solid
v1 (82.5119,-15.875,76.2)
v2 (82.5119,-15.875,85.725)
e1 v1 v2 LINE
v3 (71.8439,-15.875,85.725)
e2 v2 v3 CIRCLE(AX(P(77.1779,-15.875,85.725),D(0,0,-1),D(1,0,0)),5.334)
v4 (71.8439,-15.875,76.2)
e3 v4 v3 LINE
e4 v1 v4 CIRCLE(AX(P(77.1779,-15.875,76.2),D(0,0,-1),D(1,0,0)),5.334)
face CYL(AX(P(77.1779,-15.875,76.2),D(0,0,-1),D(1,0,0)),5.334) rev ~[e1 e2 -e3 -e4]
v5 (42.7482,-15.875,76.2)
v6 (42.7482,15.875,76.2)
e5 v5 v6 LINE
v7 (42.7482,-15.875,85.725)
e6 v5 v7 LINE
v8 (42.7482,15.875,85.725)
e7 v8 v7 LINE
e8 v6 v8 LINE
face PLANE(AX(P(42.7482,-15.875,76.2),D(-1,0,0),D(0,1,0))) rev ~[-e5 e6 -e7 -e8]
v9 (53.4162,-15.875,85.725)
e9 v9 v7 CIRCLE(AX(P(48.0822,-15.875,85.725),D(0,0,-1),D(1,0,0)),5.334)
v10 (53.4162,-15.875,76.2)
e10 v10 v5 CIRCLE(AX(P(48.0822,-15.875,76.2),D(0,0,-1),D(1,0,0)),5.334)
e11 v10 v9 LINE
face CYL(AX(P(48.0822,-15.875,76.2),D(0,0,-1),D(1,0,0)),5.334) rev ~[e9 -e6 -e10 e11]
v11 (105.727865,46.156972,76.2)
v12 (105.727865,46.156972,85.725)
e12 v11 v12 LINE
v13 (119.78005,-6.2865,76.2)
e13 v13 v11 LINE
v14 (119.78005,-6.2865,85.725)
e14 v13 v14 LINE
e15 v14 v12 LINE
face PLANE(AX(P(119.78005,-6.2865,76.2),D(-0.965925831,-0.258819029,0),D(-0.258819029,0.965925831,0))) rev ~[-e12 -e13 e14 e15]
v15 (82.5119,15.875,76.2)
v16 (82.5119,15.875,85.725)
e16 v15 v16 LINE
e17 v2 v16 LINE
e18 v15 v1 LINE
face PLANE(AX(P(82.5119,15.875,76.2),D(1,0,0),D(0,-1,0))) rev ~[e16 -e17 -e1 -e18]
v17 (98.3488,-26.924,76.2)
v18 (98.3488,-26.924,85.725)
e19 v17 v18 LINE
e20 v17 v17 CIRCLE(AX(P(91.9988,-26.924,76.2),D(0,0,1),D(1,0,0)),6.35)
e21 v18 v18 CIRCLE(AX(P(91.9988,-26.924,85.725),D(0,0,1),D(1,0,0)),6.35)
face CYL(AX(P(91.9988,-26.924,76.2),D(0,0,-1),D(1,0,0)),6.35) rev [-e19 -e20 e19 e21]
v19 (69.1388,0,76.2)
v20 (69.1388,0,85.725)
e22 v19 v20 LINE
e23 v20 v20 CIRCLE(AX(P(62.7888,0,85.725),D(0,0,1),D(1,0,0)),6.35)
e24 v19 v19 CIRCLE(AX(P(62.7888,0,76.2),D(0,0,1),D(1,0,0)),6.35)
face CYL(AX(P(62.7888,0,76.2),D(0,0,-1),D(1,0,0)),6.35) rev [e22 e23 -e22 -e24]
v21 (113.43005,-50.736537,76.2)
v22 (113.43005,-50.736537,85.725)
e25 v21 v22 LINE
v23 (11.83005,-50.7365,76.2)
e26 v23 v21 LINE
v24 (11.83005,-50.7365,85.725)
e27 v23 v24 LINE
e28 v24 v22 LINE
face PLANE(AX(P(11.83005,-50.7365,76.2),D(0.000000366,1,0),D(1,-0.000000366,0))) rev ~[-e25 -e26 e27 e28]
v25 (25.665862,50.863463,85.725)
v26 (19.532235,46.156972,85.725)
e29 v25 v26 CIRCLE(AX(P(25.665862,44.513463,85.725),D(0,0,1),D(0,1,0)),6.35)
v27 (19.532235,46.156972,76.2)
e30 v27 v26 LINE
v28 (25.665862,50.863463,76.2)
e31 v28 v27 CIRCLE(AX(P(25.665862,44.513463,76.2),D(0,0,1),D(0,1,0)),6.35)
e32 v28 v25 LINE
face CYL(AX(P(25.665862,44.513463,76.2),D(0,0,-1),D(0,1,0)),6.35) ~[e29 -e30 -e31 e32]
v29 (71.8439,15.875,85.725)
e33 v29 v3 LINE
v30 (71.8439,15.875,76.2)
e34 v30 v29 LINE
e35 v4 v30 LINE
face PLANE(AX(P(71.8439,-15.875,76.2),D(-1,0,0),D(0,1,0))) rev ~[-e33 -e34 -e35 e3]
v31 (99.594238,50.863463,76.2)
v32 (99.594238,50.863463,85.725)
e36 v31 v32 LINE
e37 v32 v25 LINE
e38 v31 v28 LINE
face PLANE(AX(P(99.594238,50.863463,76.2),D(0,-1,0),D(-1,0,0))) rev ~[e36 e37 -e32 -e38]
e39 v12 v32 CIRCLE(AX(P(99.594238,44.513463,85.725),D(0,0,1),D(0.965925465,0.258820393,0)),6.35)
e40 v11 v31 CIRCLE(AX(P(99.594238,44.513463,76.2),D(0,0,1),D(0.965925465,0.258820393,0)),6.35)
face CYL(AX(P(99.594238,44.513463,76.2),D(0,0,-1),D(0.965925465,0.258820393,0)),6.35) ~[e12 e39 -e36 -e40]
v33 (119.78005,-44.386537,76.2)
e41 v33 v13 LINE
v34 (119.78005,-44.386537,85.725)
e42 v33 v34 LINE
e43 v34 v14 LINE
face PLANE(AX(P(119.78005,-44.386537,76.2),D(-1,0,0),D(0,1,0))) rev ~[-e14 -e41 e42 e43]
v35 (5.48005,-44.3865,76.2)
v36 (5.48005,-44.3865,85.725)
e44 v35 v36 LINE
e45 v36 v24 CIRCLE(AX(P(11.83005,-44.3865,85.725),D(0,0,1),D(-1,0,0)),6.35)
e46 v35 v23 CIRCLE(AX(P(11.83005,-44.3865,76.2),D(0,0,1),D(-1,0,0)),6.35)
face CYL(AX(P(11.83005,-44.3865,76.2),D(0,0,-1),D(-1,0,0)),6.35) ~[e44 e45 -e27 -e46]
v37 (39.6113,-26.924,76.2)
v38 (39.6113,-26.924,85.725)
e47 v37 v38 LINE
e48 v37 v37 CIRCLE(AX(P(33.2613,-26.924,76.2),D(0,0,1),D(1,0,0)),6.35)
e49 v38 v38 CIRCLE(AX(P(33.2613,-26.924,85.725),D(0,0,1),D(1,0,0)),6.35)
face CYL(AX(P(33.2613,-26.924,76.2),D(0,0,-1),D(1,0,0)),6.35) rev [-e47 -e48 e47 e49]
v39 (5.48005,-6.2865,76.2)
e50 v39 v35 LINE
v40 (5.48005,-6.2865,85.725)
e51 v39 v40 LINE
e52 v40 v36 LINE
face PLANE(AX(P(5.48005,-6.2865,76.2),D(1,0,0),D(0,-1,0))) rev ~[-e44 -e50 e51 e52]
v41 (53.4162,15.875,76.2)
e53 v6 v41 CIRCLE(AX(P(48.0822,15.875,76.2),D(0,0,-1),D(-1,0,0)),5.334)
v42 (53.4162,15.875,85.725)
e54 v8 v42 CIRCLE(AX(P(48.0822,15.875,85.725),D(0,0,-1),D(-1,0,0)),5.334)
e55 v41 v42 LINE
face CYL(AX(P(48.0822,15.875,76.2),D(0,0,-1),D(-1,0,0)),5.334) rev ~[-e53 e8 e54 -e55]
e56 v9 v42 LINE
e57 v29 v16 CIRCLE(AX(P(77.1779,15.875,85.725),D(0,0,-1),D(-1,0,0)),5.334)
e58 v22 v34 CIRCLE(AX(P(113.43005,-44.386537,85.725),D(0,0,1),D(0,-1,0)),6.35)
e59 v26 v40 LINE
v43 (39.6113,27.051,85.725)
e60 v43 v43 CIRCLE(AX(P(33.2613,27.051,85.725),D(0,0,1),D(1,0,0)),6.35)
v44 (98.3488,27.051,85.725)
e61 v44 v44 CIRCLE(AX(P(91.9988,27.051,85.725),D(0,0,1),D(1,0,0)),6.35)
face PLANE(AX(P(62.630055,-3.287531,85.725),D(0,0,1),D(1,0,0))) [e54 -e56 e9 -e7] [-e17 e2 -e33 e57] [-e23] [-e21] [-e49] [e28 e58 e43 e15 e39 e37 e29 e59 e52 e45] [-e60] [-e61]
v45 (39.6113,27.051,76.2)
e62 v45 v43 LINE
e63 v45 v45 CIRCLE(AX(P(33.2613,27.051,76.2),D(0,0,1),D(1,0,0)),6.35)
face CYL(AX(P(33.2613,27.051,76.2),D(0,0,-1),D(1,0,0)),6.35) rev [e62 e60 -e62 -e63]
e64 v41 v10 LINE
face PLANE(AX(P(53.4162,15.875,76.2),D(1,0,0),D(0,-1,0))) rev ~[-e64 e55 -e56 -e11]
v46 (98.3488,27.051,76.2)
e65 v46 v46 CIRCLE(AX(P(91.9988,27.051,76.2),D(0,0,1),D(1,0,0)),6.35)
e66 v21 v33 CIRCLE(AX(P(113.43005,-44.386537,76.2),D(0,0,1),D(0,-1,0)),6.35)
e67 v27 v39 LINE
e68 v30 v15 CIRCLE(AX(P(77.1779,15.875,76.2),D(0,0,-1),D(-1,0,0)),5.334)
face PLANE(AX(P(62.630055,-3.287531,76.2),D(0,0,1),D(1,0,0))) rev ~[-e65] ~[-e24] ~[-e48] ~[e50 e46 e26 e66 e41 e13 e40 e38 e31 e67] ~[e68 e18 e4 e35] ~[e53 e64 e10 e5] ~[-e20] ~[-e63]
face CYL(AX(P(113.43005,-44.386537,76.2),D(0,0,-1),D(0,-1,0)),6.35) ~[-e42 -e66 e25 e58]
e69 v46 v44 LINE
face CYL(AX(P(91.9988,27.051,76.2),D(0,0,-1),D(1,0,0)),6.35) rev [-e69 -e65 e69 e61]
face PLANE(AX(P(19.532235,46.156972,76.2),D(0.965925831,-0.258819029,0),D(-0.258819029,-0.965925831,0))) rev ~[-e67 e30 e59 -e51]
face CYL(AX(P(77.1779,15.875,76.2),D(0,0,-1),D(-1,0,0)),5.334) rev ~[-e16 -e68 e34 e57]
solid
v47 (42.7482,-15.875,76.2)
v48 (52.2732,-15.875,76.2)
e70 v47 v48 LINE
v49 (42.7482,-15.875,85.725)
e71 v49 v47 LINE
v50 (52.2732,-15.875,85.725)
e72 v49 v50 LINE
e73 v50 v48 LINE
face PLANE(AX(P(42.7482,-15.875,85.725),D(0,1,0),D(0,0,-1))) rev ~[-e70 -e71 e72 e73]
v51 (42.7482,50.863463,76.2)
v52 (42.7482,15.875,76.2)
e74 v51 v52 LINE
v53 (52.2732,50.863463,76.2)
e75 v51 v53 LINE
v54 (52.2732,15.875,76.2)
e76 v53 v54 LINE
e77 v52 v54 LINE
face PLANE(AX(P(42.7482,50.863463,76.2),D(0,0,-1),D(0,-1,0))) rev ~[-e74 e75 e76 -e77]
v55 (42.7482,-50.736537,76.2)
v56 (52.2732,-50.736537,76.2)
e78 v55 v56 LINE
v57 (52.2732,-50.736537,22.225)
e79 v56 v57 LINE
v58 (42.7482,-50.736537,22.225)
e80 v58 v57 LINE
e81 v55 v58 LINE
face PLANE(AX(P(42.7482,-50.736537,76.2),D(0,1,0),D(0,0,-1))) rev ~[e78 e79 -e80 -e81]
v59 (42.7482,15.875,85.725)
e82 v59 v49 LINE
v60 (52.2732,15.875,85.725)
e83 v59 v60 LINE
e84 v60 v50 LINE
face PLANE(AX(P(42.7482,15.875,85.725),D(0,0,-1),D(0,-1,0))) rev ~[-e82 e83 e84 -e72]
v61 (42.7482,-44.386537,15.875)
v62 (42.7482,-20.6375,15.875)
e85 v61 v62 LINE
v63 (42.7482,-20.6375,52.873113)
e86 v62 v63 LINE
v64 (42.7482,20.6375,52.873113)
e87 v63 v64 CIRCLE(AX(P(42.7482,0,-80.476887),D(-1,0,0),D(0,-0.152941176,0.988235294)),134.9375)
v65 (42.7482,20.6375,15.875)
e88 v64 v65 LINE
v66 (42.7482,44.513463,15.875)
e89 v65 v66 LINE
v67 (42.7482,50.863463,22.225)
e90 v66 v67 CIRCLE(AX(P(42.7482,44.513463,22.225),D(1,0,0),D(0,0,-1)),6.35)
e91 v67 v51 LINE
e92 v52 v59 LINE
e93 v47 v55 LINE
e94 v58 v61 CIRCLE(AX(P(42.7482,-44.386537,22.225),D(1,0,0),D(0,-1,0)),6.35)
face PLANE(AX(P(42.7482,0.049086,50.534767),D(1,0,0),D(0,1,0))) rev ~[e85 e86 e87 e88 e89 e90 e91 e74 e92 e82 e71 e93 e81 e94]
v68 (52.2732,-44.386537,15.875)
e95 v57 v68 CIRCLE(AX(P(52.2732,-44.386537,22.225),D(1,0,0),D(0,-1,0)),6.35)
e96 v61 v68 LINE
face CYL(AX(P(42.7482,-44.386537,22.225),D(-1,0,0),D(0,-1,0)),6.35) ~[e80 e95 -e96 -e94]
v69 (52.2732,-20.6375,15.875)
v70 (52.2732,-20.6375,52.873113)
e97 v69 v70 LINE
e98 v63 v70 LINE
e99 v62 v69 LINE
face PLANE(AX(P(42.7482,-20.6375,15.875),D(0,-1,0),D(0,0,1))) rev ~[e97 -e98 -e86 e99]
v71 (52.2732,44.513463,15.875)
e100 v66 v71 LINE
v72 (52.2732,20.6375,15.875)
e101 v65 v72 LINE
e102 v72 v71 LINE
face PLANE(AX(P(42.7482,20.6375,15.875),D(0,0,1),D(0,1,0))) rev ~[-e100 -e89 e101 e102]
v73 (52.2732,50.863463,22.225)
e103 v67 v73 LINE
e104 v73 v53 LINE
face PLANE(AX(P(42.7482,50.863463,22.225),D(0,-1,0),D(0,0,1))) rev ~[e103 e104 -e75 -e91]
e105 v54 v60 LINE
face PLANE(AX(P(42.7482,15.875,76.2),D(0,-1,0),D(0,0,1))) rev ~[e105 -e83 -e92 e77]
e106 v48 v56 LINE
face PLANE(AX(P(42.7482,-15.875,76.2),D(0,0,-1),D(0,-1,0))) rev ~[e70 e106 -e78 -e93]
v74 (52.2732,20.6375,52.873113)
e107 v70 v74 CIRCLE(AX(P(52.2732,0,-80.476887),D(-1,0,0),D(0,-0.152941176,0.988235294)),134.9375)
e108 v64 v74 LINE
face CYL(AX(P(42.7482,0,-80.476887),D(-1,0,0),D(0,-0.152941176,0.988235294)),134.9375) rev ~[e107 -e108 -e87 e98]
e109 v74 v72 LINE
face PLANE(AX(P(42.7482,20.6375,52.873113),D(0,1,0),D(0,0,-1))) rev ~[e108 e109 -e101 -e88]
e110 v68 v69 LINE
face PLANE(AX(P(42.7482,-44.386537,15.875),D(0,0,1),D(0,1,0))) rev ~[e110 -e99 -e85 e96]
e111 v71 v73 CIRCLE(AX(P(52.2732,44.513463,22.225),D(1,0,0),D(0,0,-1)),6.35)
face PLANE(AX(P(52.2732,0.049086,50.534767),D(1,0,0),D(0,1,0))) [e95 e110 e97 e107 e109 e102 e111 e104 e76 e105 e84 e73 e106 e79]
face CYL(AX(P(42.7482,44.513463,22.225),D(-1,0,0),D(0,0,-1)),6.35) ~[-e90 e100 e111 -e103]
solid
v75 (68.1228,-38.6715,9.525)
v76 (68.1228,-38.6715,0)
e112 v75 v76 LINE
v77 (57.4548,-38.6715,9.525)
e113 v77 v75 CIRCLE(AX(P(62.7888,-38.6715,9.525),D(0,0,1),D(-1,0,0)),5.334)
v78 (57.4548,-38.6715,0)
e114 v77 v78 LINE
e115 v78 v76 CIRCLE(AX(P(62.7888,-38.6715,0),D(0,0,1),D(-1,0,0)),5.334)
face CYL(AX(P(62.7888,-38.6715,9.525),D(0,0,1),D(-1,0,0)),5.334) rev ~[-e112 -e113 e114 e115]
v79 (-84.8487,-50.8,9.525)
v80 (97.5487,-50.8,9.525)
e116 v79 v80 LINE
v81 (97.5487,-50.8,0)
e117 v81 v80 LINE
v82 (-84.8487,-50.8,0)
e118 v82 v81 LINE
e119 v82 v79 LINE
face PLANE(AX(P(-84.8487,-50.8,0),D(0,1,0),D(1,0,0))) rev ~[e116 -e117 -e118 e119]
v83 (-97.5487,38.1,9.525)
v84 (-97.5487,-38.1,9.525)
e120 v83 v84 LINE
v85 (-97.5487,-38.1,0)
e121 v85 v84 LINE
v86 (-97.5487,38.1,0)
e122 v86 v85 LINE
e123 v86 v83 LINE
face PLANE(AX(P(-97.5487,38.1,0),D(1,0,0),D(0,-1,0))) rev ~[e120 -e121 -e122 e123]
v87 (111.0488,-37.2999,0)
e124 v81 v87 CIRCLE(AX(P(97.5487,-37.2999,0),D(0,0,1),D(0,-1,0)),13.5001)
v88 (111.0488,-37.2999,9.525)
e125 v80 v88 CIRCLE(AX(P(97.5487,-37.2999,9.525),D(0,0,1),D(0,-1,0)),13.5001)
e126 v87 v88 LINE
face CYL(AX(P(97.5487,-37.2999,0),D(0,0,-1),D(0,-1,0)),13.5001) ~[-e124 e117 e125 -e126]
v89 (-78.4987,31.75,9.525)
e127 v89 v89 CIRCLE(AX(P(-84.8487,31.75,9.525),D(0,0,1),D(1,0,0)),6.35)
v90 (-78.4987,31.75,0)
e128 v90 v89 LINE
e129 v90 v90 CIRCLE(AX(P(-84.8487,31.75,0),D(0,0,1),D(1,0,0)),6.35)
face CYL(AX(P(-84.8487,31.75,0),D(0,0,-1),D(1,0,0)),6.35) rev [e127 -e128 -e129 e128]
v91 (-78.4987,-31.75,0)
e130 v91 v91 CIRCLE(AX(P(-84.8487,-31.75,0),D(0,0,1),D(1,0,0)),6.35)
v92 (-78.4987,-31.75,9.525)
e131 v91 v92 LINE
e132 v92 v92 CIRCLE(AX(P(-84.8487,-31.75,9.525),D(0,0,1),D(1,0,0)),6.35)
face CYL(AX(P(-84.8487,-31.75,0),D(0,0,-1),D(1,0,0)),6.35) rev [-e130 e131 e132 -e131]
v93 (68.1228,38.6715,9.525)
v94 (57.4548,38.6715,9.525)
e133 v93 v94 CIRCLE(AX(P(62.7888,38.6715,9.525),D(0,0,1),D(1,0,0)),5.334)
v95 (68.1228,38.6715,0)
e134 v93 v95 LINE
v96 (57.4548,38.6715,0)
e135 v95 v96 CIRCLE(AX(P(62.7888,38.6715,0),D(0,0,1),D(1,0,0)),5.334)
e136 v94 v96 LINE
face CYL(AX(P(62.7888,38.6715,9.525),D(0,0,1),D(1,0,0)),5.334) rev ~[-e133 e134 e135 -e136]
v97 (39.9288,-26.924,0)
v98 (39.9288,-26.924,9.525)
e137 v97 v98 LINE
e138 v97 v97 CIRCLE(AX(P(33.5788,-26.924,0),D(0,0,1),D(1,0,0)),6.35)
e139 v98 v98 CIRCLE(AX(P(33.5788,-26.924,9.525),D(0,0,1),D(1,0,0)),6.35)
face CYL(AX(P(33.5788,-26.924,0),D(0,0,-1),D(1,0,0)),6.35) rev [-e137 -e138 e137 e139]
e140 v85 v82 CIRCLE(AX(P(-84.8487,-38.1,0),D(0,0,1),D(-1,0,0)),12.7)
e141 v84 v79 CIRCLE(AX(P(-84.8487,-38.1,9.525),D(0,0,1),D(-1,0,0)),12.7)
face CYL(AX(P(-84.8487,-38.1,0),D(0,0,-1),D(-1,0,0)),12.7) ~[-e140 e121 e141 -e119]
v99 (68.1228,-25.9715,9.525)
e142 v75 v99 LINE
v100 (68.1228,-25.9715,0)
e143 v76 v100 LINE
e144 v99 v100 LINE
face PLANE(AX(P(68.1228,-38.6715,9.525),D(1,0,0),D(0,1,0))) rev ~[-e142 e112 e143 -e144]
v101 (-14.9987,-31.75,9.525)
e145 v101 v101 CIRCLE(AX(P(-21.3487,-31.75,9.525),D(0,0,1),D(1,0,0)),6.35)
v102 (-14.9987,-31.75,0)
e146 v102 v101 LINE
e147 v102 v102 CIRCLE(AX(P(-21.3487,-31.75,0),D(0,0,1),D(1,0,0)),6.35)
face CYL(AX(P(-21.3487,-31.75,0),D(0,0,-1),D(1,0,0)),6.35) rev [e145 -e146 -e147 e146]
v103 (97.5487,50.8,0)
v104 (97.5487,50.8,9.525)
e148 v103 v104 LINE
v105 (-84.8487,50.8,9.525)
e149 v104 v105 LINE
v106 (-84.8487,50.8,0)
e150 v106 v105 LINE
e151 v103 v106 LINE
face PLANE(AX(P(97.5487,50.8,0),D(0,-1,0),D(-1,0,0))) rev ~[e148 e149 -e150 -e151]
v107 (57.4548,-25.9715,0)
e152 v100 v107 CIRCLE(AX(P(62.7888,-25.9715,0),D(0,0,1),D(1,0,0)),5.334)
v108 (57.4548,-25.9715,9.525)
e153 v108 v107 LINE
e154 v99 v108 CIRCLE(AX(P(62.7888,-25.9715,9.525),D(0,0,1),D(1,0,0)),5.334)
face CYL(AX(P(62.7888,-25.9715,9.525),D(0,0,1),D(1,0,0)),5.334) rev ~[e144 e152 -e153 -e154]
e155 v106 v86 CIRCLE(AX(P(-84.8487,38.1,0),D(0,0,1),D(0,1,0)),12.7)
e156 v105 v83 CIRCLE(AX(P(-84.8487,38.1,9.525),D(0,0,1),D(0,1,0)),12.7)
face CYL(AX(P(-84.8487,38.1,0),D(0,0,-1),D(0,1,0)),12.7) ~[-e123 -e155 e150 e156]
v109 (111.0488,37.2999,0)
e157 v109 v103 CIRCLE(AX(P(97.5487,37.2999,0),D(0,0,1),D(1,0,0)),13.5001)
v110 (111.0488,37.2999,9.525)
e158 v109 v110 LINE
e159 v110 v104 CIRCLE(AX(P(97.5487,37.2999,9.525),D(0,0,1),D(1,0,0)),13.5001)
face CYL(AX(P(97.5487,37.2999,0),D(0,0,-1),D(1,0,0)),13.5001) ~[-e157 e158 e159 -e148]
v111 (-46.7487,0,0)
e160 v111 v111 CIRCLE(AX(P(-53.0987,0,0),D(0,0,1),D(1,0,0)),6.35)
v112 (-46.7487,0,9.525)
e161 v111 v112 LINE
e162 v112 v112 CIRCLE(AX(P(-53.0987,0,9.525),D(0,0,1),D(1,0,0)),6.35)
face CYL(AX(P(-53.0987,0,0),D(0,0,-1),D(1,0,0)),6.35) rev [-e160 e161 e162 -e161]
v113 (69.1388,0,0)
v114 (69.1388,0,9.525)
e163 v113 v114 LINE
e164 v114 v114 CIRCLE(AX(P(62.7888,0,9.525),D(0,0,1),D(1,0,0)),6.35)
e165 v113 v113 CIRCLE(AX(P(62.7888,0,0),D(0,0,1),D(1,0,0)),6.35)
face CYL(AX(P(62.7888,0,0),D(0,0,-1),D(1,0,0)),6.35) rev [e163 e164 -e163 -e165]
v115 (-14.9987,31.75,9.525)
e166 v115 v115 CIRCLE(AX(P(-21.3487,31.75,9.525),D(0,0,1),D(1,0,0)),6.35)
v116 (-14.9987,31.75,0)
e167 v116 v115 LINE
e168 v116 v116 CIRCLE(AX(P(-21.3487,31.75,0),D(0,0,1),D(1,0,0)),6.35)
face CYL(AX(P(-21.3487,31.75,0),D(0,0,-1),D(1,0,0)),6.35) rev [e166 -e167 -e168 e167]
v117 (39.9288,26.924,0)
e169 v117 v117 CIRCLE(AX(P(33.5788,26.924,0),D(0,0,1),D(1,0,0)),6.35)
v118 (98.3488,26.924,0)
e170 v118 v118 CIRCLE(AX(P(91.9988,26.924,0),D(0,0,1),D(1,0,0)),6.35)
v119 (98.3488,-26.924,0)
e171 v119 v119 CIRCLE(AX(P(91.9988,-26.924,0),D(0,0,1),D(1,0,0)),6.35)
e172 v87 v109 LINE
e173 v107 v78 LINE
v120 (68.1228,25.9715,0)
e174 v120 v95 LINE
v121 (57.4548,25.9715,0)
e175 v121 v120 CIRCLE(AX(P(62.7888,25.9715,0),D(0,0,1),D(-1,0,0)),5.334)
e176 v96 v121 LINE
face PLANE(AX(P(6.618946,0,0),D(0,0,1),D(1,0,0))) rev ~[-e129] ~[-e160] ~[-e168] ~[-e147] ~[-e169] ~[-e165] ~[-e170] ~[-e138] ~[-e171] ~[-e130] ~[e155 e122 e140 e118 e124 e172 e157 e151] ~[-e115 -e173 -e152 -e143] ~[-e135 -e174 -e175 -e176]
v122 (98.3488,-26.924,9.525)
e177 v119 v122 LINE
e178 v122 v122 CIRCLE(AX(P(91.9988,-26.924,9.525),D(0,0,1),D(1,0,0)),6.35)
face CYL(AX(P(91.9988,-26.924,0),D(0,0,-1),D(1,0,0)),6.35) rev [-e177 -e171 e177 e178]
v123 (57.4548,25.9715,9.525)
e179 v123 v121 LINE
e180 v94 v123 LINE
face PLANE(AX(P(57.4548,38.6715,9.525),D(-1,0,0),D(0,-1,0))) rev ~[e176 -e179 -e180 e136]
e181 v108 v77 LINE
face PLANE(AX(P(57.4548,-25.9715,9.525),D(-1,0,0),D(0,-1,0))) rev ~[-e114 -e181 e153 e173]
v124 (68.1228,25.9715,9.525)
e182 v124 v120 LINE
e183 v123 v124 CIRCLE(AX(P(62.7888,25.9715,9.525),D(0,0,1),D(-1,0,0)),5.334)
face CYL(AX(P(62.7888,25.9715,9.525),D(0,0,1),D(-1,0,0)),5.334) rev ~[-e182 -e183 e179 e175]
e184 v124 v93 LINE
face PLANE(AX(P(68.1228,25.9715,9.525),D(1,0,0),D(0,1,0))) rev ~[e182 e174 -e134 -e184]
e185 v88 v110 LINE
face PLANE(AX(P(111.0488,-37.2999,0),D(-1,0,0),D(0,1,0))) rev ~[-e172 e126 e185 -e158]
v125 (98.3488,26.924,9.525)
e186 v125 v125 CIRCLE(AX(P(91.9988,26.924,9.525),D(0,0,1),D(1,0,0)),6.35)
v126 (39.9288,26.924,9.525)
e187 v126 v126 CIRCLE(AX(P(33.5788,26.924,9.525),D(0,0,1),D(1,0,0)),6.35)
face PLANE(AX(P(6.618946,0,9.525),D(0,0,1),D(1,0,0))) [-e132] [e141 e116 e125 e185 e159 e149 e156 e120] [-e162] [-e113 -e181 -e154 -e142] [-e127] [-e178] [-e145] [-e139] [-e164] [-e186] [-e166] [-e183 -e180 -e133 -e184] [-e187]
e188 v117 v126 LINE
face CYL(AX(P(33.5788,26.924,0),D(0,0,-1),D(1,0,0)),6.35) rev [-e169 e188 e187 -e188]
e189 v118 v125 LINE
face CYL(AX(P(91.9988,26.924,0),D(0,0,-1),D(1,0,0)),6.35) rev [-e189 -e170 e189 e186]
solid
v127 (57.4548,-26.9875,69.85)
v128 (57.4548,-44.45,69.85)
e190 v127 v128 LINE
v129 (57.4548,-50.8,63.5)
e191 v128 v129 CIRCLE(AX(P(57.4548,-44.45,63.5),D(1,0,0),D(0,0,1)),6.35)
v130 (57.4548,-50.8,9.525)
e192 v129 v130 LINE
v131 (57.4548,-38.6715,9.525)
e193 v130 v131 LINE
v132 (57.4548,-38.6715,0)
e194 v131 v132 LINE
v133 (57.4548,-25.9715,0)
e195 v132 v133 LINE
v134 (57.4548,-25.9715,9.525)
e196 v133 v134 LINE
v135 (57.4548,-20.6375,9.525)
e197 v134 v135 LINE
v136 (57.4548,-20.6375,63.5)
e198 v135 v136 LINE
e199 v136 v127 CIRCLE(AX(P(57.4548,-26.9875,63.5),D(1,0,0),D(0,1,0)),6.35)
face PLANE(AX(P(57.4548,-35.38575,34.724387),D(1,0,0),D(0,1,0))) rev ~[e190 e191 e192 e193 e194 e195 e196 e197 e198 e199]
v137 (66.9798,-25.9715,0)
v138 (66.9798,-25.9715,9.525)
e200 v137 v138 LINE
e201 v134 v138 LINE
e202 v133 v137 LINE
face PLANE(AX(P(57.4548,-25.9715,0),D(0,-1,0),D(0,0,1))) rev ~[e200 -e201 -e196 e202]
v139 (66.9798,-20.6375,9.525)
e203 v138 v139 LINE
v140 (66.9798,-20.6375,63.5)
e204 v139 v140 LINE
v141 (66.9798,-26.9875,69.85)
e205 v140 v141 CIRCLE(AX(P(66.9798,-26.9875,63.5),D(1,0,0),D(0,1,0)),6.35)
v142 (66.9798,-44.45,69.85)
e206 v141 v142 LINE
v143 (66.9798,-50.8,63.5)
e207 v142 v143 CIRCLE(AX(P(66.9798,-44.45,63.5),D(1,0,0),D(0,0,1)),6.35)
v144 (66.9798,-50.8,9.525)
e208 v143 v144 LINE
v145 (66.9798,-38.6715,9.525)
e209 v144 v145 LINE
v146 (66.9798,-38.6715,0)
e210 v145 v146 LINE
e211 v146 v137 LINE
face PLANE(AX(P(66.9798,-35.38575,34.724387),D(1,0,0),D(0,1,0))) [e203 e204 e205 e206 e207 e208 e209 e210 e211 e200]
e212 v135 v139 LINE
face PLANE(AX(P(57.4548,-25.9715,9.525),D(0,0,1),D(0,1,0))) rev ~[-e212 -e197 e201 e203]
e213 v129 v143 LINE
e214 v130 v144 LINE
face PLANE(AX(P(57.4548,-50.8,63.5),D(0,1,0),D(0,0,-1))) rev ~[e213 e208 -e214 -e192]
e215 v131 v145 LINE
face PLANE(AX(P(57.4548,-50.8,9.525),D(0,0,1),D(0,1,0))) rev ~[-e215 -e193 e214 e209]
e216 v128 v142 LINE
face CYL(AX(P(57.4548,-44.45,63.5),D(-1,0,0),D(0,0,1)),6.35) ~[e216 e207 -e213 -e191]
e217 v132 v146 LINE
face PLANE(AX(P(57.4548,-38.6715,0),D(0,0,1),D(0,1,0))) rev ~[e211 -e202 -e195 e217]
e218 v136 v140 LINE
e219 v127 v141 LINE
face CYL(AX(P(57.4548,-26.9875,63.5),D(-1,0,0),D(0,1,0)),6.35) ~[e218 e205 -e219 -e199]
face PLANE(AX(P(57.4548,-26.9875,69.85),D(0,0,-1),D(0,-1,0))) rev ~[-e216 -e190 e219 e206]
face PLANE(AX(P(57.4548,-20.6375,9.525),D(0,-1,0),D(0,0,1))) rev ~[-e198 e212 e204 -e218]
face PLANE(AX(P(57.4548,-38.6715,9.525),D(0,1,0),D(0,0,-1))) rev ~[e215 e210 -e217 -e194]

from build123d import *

# Parameters (mm, degrees)
F0_R      = 6.35
F1_DEPTH  = 9.525
F3_DEPTH  = 25.4
F5_R      = 6.35
F6_DEPTH  = 9.525
F8_DEPTH  = 25.4
F10_DEPTH = 9.525
F12_DEPTH = 9.525


# Not quite as in the source:
# - ends of sketch curves that miss each other by under 0.0002 mm in the source are joined


with BuildPart() as f1:
    # F0 (on Top) → F1 (new body)
    with BuildSketch(Plane.XY):
        with BuildLine():
            ThreePointArc((-97.5487, -38.1), (-93.8289561211, -47.0802561211), (-84.8487, -50.8))
            Line((-84.8487, -50.8), (97.5487, -50.8))
            ThreePointArc((97.5487, -50.8), (107.0947122567, -46.8459122567), (111.0488, -37.2999))
            Line((111.0488, -37.2999), (111.0488, 37.2999))
            ThreePointArc((111.0488, 37.2999), (107.0947122567, 46.8459122567), (97.5487, 50.8))
            Line((97.5487, 50.8), (-84.8487, 50.8))
            ThreePointArc((-84.8487, 50.8), (-93.8289561211, 47.0802561211), (-97.5487, 38.1))
            Line((-97.5487, 38.1), (-97.5487, -38.1))
        make_face()
        with Locations((-84.8487, -31.75)):
            Circle(F0_R, mode=Mode.SUBTRACT)
        with Locations((-21.3487, -31.75)):
            Circle(F0_R, mode=Mode.SUBTRACT)
        with Locations((33.5788, -26.924)):
            Circle(F0_R, mode=Mode.SUBTRACT)
        with Locations((91.9988, -26.924)):
            Circle(F0_R, mode=Mode.SUBTRACT)
        with Locations((-53.0987, 0)):
            Circle(F0_R, mode=Mode.SUBTRACT)
        with Locations((62.7888, 0)):
            Circle(F0_R, mode=Mode.SUBTRACT)
        with Locations((33.5788, 26.924)):
            Circle(F0_R, mode=Mode.SUBTRACT)
        with Locations((91.9988, 26.924)):
            Circle(F0_R, mode=Mode.SUBTRACT)
        with Locations((-84.8487, 31.75)):
            Circle(F0_R, mode=Mode.SUBTRACT)
        with Locations((-21.3487, 31.75)):
            Circle(F0_R, mode=Mode.SUBTRACT)
    extrude(amount=F1_DEPTH)

    # F2 (on face) → F3 (cut)
    with BuildSketch(Plane.XY.offset(9.525)):
        with BuildLine():
            ThreePointArc((57.4548, 25.9715), (62.7888, 20.6375), (68.1228, 25.9715))
            Line((68.1228, 25.9715), (68.1228, 38.6715))
            ThreePointArc((68.1228, 38.6715), (62.7888, 44.0055), (57.4548, 38.6715))
            Line((57.4548, 38.6715), (57.4548, 25.9715))
        make_face()
        with BuildLine():
            ThreePointArc((57.4548, -38.6715), (62.7888, -44.0055), (68.1228, -38.6715))
            Line((68.1228, -38.6715), (68.1228, -25.9715))
            ThreePointArc((68.1228, -25.9715), (62.7888, -20.6375), (57.4548, -25.9715))
            Line((57.4548, -25.9715), (57.4548, -38.6715))
        make_face()
    extrude(amount=-F3_DEPTH, mode=Mode.SUBTRACT)


with BuildPart() as f6:
    # F5 (on offset) → F6 (new body)
    with BuildSketch(Plane.XY.offset(76.2)):
        with BuildLine():
            Line((99.5942382, 50.8634627833), (25.6658618, 50.8634627833))
            ThreePointArc((25.6658618, 50.8634627833), (21.8002302398, 49.5512591905), (19.5322350958, 46.1569722763))
            Line((19.5322350958, 46.1569722763), (5.48005, -6.2865))
            Line((5.48005, -6.2865), (5.48005, -44.3865))
            ThreePointArc((5.48005, -44.3865), (7.3399219395, -48.8766280605), (11.83005, -50.7365))
            Line((11.83005, -50.7365), (113.43005, -50.7365372167))
            ThreePointArc((113.43005, -50.7365372167), (117.9201780605, -48.8766652773), (119.78005, -44.3865372167))
            Line((119.78005, -44.3865372167), (119.78005, -6.2865))
            Line((119.78005, -6.2865), (105.7278649042, 46.1569722763))
            ThreePointArc((105.7278649042, 46.1569722763), (103.4598697602, 49.5512591905), (99.5942382, 50.8634627833))
        make_face()
        with Locations((33.2613, -26.924)):
            Circle(F5_R, mode=Mode.SUBTRACT)
        with Locations((91.9988, -26.924)):
            Circle(F5_R, mode=Mode.SUBTRACT)
        with Locations((62.7888, 0)):
            Circle(F5_R, mode=Mode.SUBTRACT)
        with Locations((33.2613, 27.051)):
            Circle(F5_R, mode=Mode.SUBTRACT)
        with Locations((91.9988, 27.051)):
            Circle(F5_R, mode=Mode.SUBTRACT)
    extrude(amount=F6_DEPTH)

    # F7 (on face) → F8 (cut)
    with BuildSketch(Plane(origin=(0, 0, 76.2), x_dir=(1, 0, 0), z_dir=(0, 0, -1))):
        with BuildLine():
            ThreePointArc((71.8439, -15.875), (77.1779, -21.209), (82.5119, -15.875))
            Line((82.5119, -15.875), (82.5119, 15.875))
            ThreePointArc((82.5119, 15.875), (77.1779, 21.209), (71.8439, 15.875))
            Line((71.8439, 15.875), (71.8439, -15.875))
        make_face()
        with BuildLine():
            ThreePointArc((42.7482, -15.875), (48.0822, -21.209), (53.4162, -15.875))
            Line((53.4162, -15.875), (53.4162, 15.875))
            ThreePointArc((53.4162, 15.875), (48.0822, 21.209), (42.7482, 15.875))
            Line((42.7482, 15.875), (42.7482, -15.875))
        make_face()
    extrude(amount=-F8_DEPTH, mode=Mode.SUBTRACT)


with BuildPart() as f10:
    # F9 (on face) → F10 (new body)
    with BuildSketch(Plane.YZ.offset(42.7482)):
        with BuildLine():
            Line((15.875, 76.2), (15.875, 85.725))
            Line((15.875, 85.725), (-15.875, 85.725))
            Line((-15.875, 85.725), (-15.875, 76.2))
            Line((-15.875, 76.2), (-50.7365372167, 76.2))
            Line((-50.7365372167, 76.2), (-50.7365372167, 22.225))
            ThreePointArc((-50.7365372167, 22.225), (-48.8766652773, 17.7348719395), (-44.3865372167, 15.875))
            Line((-44.3865372167, 15.875), (-20.6375, 15.875))
            Line((-20.6375, 15.875), (-20.6375, 52.8731126447))
            ThreePointArc((-20.6375, 52.8731126447), (0, 54.4606126447), (20.6375, 52.8731126447))
            Line((20.6375, 52.8731126447), (20.6375, 15.875))
            Line((20.6375, 15.875), (44.5134627833, 15.875))
            ThreePointArc((44.5134627833, 15.875), (49.0035908438, 17.7348719395), (50.8634627833, 22.225))
            Line((50.8634627833, 22.225), (50.8634627833, 76.2))
            Line((50.8634627833, 76.2), (15.875, 76.2))
        make_face()
    extrude(amount=F10_DEPTH)


with BuildPart() as f12:
    # F11 (on face) → F12 (new body)
    with BuildSketch(Plane.YZ.offset(57.4548)):
        with BuildLine():
            Line((-38.6715, 0), (-25.9715, 0))
            Line((-25.9715, 0), (-25.9715, 9.525))
            Line((-25.9715, 9.525), (-20.6375, 9.525))
            Line((-20.6375, 9.525), (-20.6375, 63.5))
            ThreePointArc((-20.6375, 63.5), (-22.4973719395, 67.9901280605), (-26.9875, 69.85))
            Line((-26.9875, 69.85), (-44.45, 69.85))
            ThreePointArc((-44.45, 69.85), (-48.9401280605, 67.9901280605), (-50.8, 63.5))
            Line((-50.8, 63.5), (-50.8, 9.525))
            Line((-50.8, 9.525), (-38.6715, 9.525))
            Line((-38.6715, 9.525), (-38.6715, 0))
        make_face()
    extrude(amount=F12_DEPTH)


solid = Compound([f1.part, f6.part, f10.part, f12.part])
